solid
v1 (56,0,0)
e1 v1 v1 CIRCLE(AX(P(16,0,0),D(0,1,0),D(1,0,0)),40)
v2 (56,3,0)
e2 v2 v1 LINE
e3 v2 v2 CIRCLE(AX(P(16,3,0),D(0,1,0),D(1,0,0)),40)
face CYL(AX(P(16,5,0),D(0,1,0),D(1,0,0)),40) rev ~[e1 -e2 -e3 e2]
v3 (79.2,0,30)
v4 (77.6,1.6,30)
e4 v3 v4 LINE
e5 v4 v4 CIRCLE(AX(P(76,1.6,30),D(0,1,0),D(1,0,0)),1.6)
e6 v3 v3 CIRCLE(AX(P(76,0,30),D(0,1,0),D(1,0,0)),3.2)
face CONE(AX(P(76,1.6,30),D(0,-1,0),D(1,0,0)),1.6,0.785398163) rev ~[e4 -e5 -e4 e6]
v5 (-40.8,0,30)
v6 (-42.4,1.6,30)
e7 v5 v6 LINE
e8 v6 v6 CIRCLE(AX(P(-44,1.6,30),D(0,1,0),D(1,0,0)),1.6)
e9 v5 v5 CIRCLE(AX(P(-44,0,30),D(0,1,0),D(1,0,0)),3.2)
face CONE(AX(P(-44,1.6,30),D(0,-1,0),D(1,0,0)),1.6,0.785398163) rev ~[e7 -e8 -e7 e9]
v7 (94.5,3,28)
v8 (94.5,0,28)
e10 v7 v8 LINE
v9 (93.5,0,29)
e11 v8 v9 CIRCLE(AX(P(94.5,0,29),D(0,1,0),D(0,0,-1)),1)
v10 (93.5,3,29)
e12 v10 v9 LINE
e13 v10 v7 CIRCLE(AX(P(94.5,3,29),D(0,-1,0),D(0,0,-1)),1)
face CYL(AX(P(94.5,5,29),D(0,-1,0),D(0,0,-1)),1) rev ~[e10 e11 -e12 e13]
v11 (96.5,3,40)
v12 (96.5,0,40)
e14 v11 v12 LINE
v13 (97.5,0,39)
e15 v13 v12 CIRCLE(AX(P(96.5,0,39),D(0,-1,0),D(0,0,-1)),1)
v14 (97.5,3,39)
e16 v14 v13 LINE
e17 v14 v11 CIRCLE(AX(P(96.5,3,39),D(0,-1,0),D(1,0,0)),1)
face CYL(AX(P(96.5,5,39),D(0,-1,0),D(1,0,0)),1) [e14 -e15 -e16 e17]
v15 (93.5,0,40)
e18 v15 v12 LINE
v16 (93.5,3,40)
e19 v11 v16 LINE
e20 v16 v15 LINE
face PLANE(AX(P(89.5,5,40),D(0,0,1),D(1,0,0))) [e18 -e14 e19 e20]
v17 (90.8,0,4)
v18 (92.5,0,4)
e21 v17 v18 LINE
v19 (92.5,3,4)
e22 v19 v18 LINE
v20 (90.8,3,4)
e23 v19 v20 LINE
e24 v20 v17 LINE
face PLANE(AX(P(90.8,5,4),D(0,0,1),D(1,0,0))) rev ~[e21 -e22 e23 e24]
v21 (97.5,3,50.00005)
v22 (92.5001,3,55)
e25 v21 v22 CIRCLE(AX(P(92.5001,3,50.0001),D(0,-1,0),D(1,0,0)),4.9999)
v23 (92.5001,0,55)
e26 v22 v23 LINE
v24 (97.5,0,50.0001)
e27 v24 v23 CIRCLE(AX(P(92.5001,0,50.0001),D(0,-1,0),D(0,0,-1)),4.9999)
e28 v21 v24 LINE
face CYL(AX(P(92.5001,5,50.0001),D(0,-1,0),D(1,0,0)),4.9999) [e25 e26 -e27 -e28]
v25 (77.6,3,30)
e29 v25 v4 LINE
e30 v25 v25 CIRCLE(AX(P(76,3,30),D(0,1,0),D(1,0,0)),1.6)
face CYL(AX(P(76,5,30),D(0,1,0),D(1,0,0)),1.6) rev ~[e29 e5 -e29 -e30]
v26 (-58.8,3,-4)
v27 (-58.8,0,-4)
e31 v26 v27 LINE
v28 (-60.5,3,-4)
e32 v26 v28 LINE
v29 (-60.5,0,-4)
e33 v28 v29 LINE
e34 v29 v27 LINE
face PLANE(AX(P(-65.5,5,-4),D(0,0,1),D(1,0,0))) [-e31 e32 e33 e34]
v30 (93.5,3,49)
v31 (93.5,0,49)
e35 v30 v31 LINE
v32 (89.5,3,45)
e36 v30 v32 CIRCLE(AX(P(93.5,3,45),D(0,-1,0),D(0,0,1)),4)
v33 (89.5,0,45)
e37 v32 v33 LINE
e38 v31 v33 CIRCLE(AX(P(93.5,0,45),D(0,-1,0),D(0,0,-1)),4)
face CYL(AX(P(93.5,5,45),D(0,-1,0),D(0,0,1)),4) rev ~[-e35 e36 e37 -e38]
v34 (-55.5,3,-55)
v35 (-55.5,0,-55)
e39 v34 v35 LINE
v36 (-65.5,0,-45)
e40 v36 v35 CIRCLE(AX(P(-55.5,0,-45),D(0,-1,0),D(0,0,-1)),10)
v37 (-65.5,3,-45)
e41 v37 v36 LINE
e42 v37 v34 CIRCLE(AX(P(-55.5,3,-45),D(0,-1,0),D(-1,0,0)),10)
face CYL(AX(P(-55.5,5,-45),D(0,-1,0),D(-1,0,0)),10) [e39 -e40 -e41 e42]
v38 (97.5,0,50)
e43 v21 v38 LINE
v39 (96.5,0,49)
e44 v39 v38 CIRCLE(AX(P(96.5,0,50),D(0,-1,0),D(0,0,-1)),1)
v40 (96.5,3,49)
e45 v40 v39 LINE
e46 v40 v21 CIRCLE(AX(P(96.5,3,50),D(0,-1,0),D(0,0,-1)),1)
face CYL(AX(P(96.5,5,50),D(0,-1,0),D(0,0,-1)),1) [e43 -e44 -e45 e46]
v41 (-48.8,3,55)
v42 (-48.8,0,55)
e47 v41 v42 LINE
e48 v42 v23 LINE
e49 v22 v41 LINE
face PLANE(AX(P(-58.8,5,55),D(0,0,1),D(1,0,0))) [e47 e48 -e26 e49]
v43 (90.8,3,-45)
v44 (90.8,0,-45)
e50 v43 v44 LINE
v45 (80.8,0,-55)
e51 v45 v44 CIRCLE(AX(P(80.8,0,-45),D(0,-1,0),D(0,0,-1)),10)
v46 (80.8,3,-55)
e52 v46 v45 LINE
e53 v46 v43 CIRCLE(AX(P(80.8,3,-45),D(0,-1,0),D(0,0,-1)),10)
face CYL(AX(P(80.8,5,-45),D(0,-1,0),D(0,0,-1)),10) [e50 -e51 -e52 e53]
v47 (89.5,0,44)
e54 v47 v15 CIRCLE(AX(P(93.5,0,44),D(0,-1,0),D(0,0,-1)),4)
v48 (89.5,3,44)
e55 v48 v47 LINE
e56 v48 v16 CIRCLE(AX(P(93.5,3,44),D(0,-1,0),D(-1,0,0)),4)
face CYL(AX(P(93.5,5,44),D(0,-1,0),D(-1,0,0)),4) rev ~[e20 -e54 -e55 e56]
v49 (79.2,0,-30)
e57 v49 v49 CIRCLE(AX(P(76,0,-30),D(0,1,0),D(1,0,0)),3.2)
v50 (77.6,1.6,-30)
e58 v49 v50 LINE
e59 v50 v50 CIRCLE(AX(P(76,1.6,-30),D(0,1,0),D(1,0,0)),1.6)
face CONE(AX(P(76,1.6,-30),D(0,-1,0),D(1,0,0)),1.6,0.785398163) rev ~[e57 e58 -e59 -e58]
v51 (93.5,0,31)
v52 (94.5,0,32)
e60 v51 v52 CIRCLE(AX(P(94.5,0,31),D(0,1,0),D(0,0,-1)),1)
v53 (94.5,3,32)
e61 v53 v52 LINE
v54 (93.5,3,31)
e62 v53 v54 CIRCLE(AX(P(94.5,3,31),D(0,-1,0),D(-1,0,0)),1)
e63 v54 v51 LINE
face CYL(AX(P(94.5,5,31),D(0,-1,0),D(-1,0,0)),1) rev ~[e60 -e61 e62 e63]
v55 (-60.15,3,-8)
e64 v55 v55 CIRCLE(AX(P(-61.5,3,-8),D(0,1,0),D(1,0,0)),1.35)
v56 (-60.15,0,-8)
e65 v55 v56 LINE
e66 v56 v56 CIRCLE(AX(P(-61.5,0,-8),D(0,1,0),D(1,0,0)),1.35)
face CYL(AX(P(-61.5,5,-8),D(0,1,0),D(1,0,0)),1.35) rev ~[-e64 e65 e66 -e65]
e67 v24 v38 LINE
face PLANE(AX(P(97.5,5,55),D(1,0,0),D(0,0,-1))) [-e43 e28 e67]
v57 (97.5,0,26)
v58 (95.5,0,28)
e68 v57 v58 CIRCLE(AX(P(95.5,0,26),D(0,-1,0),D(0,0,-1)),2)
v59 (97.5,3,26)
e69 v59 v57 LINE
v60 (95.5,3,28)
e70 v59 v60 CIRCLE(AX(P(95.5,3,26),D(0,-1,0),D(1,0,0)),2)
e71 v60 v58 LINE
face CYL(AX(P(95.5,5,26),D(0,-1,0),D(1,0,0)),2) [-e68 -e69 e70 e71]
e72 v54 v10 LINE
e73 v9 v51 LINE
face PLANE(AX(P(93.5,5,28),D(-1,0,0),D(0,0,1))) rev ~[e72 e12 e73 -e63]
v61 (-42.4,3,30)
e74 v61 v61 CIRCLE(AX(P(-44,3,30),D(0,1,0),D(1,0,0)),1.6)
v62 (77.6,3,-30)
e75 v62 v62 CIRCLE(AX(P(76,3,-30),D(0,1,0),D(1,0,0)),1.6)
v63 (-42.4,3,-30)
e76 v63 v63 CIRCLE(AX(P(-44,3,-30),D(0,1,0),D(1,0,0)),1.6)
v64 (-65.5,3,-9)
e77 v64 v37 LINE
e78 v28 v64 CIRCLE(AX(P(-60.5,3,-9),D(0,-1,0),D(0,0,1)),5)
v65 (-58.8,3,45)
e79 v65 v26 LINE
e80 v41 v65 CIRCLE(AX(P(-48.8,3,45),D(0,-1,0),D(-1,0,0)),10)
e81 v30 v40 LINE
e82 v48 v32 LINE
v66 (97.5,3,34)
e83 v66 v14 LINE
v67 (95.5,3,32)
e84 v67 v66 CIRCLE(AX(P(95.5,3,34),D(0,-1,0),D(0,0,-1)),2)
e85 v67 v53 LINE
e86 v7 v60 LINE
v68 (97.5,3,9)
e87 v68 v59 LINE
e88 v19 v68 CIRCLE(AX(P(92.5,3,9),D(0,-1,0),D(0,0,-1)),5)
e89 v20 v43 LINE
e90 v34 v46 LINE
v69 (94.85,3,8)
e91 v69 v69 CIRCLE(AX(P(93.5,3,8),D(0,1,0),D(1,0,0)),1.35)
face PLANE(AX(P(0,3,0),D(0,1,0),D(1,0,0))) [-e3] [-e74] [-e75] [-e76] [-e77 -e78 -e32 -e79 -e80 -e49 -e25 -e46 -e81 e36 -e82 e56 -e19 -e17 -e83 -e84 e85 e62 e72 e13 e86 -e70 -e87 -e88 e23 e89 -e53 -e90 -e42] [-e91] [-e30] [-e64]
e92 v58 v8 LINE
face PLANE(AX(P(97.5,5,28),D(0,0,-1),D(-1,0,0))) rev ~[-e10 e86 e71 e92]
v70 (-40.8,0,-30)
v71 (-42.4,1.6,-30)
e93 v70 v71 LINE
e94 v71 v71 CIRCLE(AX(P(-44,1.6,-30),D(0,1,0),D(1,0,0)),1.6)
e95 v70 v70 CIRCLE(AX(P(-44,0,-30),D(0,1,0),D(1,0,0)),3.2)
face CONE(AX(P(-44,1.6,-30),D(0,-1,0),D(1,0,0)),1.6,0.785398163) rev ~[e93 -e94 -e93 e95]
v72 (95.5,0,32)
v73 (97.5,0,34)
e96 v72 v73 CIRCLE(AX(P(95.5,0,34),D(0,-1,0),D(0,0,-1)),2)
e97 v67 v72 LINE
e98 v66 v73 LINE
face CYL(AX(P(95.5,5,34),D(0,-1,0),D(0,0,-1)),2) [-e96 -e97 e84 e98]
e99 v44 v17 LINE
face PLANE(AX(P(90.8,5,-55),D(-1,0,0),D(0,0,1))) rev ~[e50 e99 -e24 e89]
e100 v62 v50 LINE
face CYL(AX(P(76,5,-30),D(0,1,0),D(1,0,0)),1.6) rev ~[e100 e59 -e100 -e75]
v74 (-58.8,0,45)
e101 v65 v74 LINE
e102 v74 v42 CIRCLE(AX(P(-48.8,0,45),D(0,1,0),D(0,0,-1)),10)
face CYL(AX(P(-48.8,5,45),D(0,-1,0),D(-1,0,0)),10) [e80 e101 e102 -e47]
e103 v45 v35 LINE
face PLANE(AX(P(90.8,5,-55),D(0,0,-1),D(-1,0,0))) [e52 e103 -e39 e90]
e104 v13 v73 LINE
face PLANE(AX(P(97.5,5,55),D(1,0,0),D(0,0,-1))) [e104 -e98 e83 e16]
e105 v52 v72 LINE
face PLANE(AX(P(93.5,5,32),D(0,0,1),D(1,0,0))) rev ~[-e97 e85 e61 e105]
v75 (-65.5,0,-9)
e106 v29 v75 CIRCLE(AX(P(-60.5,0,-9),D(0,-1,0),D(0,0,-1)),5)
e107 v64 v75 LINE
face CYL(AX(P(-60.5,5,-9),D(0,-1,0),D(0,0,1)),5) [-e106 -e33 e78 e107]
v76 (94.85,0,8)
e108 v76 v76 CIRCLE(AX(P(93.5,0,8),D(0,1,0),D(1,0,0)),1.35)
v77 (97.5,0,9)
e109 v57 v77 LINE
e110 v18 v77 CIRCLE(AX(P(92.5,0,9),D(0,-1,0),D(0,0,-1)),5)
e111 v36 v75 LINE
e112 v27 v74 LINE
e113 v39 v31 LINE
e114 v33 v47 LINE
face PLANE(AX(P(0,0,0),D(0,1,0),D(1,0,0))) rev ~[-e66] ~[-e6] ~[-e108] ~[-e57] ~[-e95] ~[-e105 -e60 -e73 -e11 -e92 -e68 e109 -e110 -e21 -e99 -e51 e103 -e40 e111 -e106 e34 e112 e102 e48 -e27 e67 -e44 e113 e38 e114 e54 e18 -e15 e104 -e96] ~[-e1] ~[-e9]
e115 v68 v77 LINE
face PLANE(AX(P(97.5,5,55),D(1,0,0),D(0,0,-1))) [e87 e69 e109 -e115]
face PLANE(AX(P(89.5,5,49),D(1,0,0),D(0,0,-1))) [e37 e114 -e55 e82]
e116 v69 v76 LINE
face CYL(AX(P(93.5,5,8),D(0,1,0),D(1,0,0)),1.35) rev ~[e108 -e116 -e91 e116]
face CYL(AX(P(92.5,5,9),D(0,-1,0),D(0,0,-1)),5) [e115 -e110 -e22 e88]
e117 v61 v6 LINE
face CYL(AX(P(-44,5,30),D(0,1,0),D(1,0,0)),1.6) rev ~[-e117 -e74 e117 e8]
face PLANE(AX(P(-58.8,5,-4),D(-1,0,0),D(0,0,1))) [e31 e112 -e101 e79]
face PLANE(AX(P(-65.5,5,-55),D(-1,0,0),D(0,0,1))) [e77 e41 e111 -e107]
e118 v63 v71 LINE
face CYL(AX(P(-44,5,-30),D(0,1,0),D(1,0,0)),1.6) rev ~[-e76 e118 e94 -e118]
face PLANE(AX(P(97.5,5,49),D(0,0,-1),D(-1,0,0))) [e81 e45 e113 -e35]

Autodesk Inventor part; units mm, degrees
ref_plane "YZ Plane" through (0, 0, 0) normal (1, 0, 0) x (0, 1, 0)
ref_plane "XZ Plane" through (0, 0, 0) normal (0, 1, 0) x (-1, 0, 0)
ref_plane "XY Plane" through (0, 0, 0) normal (0, 0, 1) x (1, 0, 0)
sketch "Sketch1" plane through (0, 0, 0) normal (0, 1, 0) x (-1, 0, 0)
  circle A0 centre (0, 0) radius 40
  circle A1 centre (0, 0) radius 25
  dimension "d1" = 50
  dimension "d13" = 15
extrude "Extrusion1" add sketch "Sketch1" along normal blind 5
sketch "Sketch2" plane through (0, 5, 0) normal (0, 1, 0) x (1, 0, 0)
  circle A0 centre (-33, 0) radius 1.25
  circle A1 centre (0, 0) radius 25 projected
  circle A2 centre (0, 0) radius 33 construction
  dimension "d4" = 2.5
  dimension "d12" = 8
extrude "Extrusion2" cut sketch "Sketch2" against normal blind 10 contours A0
pattern_circular "Circular Pattern1" count 6 over 360 about axis through (0, 0, 0) along (0, 1, 0) of "Extrusion2"
sketch "Sketch3" plane through (0, 5, 0) normal (0, 1, 0) x (1, 0, 0)
  line L0 (-85, -42.5) -> (85, -42.5)
  line L1 (85, -42.5) -> (85, 42.5)
  line L2 (85, 42.5) -> (-85, 42.5)
  line L3 (-85, 42.5) -> (-85, -42.5)
  line L4 (-85, -42.5) -> (85, 42.5) construction
  line L5 (85, -42.5) -> (-85, 42.5) construction
  line L6 (34.5, 15.5) -> (65.5, 15.5) construction
  line L7 (65.5, 15.5) -> (65.5, -15.5) construction
  line L8 (65.5, -15.5) -> (34.5, -15.5) construction
  line L9 (34.5, -15.5) -> (34.5, 15.5) construction
  line L10 (34.5, 15.5) -> (65.5, -15.5) construction
  line L11 (65.5, 15.5) -> (34.5, -15.5) construction
  circle A0 centre (34.5, 15.5) radius 1.5
  circle A1 centre (65.5, 15.5) radius 1.5
  circle A2 centre (65.5, -15.5) radius 1.5
  circle A3 centre (34.5, -15.5) radius 1.5
  line L12 (0, 0) -> (50, 0) construction
  circle A4 centre (0, 0) radius 40
  circle A5 centre (0, 0) radius 40 projected
  line L13 (-50, 42.5) -> (-50, -42.5)
  circle A6 centre (50, 0) radius 12
  dimension "d14" = 85
  dimension "d15" = 170
  dimension "d16" = 31
  dimension "d17" = 31
  dimension "d18" = 3
  dimension "d19" = 3
  dimension "d20" = 3
  dimension "d21" = 3
  dimension "d22" = 50
  dimension "d23" = 35
  dimension "d26" = 24
extrude "Extrusion3" add sketch "Sketch3" against normal blind 5 contours L13 L2 L1 L0
sketch "Sketch4" plane through (0, 5, 0) normal (0, 1, 0) x (1, 0, 0)
  arc A0 (39.56, -5.9166) -> (39.56, 5.9166) centre (50, 0) ccw projected
  circle A1 centre (50, 0) radius 12
  point P0 (0, 0)
  point P1 (39.56, 5.9166)
  point P2 (39.56, -5.9166)
extrude "Extrusion4" cut sketch "Sketch4" against normal blind 5
sketch "Sketch5" plane through (0, 5, 0) normal (0, 1, 0) x (1, 0, 0)
  circle A0 centre (65.5, 15.5) radius 1.5 projected
  circle A1 centre (65.5, 15.5) radius 1.5
  line L0 (34.5, -15.5) -> (65.5, -15.5)
  line L1 (65.5, -15.5) -> (65.5, 15.5)
  line L2 (65.5, 15.5) -> (34.5, 15.5)
  line L3 (34.5, 15.5) -> (34.5, -15.5)
  circle A2 centre (50, 0) radius 12 projected
  line L4 (34.5, -15.5) -> (65.5, 15.5) construction
  line L5 (65.5, -15.5) -> (34.5, 15.5) construction
  circle A3 centre (34.5, 15.5) radius 1.5
  circle A4 centre (34.5, -15.5) radius 1.5
  point P0 (0, 0)
  dimension "d30" = 3
  dimension "d31" = 3
extrude "Extrusion5" cut sketch "Sketch5" against normal blind 5 contours A3 L3 L2 | L2 L3 A3 | A4 L3 L0 | L0 L3 A4
sketch "Sketch6" plane through (0, 5, 0) normal (0, 1, 0) x (1, 0, 0)
  line L0 (-65.5, -55) -> (97.5, -55)
  line L1 (97.5, -55) -> (97.5, 55)
  line L2 (97.5, 55) -> (-65.5, 55)
  line L3 (-65.5, 55) -> (-65.5, -55)
  line L4 (-65.5, -55) -> (97.5, 55) construction
  line L5 (97.5, -55) -> (-65.5, 55) construction
  line L6 (-65.5, 4) -> (-58.8, 4)
  line L7 (-58.8, 4) -> (-58.8, -55)
  line L8 (-58.8, -55) -> (-65.5, -55)
  line L9 (-65.5, -55) -> (-65.5, 4)
  line L10 (97.5, 55) -> (90.8, 55)
  line L11 (90.8, 55) -> (90.8, -4)
  line L12 (90.8, -4) -> (97.5, -4)
  line L13 (97.5, -4) -> (97.5, 55)
  line L14 (-50, -42.5) -> (-50, 42.5) projected
  line L15 (85, 42.5) -> (85, -42.5) projected
  line L16 (-50, 42.5) -> (85, 42.5)
  line L17 (85, 42.5) -> (85, -42.5)
  line L18 (85, -42.5) -> (-50, -42.5)
  line L19 (-50, -42.5) -> (-50, 42.5)
  point P0 (0, 0)
  point P1 (16, 0)
  dimension "d34" = 16
  dimension "d35" = 110
  dimension "d36" = 163
  dimension "d37" = 6.7
  dimension "d38" = 6.7
  dimension "d40" = 51
  dimension "d41" = 51
extrude "Extrusion6" add sketch "Sketch6" against normal blind 5 contours L7 L6 L3 L2 L11 L12 L1 L0
sketch "Sketch7" plane through (0, 5, 0) normal (0, 1, 0) x (1, 0, 0)
  line L0 (97.5, -49) -> (89.5, -49)
  line L1 (89.5, -49) -> (89.5, -40)
  line L2 (89.5, -40) -> (97.5, -40)
  line L3 (97.5, -40) -> (97.5, -49)
  line L4 (-58.8, -55) -> (97.5, -55) projected
  line L5 (97.5, -55) -> (97.5, -4) projected
  line L6 (97.5, -28) -> (93.5, -28)
  line L7 (93.5, -28) -> (93.5, -32)
  line L8 (93.5, -32) -> (97.5, -32)
  line L9 (97.5, -32) -> (97.5, -28)
  point P0 (0, 0)
  dimension "d44" = 6
  dimension "d45" = 9
  dimension "d46" = 8
  dimension "d47" = 8
  dimension "d48" = 4
  dimension "d49" = 4
extrude "Extrusion7" cut sketch "Sketch7" against normal blind 5
fillet "Fillet2" radius 2 2 edges at (97.5, 2.5, 28) (97.5, 2.5, 32)
fillet "Fillet3" radius 1 2 edges at (93.5, 2.5, 28) (93.5, 2.5, 32)
fillet "Fillet4" radius 1 2 edges at (97.5, 2.5, 49) (97.5, 2.5, 40)
fillet "Fillet5" radius 5 1 edges at (97.5, 2.5, 55)
fillet "Fillet6" radius 4 2 edges at (89.5, 2.5, 40) (89.5, 2.5, 49)
fillet "Fillet7" radius 5 2 edges at (97.5, 2.5, 4) (-65.5, 2.5, -4)
fillet "Fillet8" radius 10 3 edges at (-58.8, 2.5, 55) (90.8, 2.5, -55) (-65.5, 2.5, -55)
sketch "Sketch8" plane through (0, 5, 0) normal (0, 1, 0) x (1, 0, 0)
  circle A0 centre (-61.5, 8) radius 1.35
  circle A1 centre (93.5, -8) radius 1.35
  line L0 (-60.5, 4) -> (-58.8, 4) projected
  line L1 (-65.5, 45) -> (-65.5, 9) projected
  line L2 (92.5, -4) -> (90.8, -4) projected
  line L3 (97.5, -26) -> (97.5, -9) projected
  point P0 (0, 0)
  dimension "d59" = 4
  dimension "d60" = 4
  dimension "d61" = 2.7
  dimension "d62" = 4
  dimension "d63" = 4
  dimension "d64" = 2.7
extrude "Extrusion8" cut sketch "Sketch8" against normal blind 5
sketch "Sketch9" plane through (0, 5, 0) normal (0, 1, 0) x (1, 0, 0)
  line L0 (-48, 44) -> (76, 44)
  line L1 (76, 44) -> (76, -39)
  line L2 (76, -39) -> (-48, -39)
  line L3 (-48, -39) -> (-48, 44)
  point P0 (0, 0)
extrude "Extrusion9" add sketch "Sketch9" against normal blind 5
sketch "Sketch10" plane through (0, 5, 0) normal (0, 1, 0) x (1, 0, 0)
  circle A0 centre (16, 0) radius 40
  line L0 (-58.8, 4) -> (-58.8, -45) projected
  point P0 (0, 0)
  dimension "d69" = 80
  dimension "d70" = 74.8
extrude "Extrusion10" cut sketch "Sketch10" against normal blind 5
sketch "Sketch11" plane through (0, 5, 0) normal (0, 1, 0) x (1, 0, 0)
  line L0 (-44, -30) -> (76, -30) construction
  line L1 (76, -30) -> (76, 30) construction
  line L2 (76, 30) -> (-44, 30) construction
  line L3 (-44, 30) -> (-44, -30) construction
  circle A0 centre (16, 0) radius 40 construction
  line L4 (-44, -30) -> (76, 30) construction
  line L5 (76, -30) -> (-44, 30) construction
  circle A1 centre (76, 30) radius 1.6
  circle A2 centre (-44, 30) radius 1.6
  circle A3 centre (-44, -30) radius 1.6
  circle A4 centre (76, -30) radius 1.6
  point P0 (0, 0)
  dimension "d73" = 60
  dimension "d74" = 120
  dimension "d75" = 3.2
  dimension "d76" = 3.2
  dimension "d77" = 3.2
  dimension "d78" = 3.2
extrude "Extrusion11" cut sketch "Sketch11" against normal blind 5
sketch "Sketch12" plane through (0, 5, 0) normal (0, 1, 0) x (1, 0, 0)
  line L0 (-160, 70) -> (160, 70)
  line L1 (160, 70) -> (160, -70)
  line L2 (160, -70) -> (-160, -70)
  line L3 (-160, -70) -> (-160, 70)
  line L4 (-160, 70) -> (160, -70) construction
  line L5 (160, 70) -> (-160, -70) construction
  point P0 (0, 0)
extrude "Extrusion12" cut sketch "Sketch12" against normal blind 2
chamfer "Chamfer1" distance 1.6 angle 45 4 edges at (-45.6, 0, 30) (74.4, 0, 30) (74.4, 0, -30) (-45.6, 0, -30)
properties part number "Microscope lid"
